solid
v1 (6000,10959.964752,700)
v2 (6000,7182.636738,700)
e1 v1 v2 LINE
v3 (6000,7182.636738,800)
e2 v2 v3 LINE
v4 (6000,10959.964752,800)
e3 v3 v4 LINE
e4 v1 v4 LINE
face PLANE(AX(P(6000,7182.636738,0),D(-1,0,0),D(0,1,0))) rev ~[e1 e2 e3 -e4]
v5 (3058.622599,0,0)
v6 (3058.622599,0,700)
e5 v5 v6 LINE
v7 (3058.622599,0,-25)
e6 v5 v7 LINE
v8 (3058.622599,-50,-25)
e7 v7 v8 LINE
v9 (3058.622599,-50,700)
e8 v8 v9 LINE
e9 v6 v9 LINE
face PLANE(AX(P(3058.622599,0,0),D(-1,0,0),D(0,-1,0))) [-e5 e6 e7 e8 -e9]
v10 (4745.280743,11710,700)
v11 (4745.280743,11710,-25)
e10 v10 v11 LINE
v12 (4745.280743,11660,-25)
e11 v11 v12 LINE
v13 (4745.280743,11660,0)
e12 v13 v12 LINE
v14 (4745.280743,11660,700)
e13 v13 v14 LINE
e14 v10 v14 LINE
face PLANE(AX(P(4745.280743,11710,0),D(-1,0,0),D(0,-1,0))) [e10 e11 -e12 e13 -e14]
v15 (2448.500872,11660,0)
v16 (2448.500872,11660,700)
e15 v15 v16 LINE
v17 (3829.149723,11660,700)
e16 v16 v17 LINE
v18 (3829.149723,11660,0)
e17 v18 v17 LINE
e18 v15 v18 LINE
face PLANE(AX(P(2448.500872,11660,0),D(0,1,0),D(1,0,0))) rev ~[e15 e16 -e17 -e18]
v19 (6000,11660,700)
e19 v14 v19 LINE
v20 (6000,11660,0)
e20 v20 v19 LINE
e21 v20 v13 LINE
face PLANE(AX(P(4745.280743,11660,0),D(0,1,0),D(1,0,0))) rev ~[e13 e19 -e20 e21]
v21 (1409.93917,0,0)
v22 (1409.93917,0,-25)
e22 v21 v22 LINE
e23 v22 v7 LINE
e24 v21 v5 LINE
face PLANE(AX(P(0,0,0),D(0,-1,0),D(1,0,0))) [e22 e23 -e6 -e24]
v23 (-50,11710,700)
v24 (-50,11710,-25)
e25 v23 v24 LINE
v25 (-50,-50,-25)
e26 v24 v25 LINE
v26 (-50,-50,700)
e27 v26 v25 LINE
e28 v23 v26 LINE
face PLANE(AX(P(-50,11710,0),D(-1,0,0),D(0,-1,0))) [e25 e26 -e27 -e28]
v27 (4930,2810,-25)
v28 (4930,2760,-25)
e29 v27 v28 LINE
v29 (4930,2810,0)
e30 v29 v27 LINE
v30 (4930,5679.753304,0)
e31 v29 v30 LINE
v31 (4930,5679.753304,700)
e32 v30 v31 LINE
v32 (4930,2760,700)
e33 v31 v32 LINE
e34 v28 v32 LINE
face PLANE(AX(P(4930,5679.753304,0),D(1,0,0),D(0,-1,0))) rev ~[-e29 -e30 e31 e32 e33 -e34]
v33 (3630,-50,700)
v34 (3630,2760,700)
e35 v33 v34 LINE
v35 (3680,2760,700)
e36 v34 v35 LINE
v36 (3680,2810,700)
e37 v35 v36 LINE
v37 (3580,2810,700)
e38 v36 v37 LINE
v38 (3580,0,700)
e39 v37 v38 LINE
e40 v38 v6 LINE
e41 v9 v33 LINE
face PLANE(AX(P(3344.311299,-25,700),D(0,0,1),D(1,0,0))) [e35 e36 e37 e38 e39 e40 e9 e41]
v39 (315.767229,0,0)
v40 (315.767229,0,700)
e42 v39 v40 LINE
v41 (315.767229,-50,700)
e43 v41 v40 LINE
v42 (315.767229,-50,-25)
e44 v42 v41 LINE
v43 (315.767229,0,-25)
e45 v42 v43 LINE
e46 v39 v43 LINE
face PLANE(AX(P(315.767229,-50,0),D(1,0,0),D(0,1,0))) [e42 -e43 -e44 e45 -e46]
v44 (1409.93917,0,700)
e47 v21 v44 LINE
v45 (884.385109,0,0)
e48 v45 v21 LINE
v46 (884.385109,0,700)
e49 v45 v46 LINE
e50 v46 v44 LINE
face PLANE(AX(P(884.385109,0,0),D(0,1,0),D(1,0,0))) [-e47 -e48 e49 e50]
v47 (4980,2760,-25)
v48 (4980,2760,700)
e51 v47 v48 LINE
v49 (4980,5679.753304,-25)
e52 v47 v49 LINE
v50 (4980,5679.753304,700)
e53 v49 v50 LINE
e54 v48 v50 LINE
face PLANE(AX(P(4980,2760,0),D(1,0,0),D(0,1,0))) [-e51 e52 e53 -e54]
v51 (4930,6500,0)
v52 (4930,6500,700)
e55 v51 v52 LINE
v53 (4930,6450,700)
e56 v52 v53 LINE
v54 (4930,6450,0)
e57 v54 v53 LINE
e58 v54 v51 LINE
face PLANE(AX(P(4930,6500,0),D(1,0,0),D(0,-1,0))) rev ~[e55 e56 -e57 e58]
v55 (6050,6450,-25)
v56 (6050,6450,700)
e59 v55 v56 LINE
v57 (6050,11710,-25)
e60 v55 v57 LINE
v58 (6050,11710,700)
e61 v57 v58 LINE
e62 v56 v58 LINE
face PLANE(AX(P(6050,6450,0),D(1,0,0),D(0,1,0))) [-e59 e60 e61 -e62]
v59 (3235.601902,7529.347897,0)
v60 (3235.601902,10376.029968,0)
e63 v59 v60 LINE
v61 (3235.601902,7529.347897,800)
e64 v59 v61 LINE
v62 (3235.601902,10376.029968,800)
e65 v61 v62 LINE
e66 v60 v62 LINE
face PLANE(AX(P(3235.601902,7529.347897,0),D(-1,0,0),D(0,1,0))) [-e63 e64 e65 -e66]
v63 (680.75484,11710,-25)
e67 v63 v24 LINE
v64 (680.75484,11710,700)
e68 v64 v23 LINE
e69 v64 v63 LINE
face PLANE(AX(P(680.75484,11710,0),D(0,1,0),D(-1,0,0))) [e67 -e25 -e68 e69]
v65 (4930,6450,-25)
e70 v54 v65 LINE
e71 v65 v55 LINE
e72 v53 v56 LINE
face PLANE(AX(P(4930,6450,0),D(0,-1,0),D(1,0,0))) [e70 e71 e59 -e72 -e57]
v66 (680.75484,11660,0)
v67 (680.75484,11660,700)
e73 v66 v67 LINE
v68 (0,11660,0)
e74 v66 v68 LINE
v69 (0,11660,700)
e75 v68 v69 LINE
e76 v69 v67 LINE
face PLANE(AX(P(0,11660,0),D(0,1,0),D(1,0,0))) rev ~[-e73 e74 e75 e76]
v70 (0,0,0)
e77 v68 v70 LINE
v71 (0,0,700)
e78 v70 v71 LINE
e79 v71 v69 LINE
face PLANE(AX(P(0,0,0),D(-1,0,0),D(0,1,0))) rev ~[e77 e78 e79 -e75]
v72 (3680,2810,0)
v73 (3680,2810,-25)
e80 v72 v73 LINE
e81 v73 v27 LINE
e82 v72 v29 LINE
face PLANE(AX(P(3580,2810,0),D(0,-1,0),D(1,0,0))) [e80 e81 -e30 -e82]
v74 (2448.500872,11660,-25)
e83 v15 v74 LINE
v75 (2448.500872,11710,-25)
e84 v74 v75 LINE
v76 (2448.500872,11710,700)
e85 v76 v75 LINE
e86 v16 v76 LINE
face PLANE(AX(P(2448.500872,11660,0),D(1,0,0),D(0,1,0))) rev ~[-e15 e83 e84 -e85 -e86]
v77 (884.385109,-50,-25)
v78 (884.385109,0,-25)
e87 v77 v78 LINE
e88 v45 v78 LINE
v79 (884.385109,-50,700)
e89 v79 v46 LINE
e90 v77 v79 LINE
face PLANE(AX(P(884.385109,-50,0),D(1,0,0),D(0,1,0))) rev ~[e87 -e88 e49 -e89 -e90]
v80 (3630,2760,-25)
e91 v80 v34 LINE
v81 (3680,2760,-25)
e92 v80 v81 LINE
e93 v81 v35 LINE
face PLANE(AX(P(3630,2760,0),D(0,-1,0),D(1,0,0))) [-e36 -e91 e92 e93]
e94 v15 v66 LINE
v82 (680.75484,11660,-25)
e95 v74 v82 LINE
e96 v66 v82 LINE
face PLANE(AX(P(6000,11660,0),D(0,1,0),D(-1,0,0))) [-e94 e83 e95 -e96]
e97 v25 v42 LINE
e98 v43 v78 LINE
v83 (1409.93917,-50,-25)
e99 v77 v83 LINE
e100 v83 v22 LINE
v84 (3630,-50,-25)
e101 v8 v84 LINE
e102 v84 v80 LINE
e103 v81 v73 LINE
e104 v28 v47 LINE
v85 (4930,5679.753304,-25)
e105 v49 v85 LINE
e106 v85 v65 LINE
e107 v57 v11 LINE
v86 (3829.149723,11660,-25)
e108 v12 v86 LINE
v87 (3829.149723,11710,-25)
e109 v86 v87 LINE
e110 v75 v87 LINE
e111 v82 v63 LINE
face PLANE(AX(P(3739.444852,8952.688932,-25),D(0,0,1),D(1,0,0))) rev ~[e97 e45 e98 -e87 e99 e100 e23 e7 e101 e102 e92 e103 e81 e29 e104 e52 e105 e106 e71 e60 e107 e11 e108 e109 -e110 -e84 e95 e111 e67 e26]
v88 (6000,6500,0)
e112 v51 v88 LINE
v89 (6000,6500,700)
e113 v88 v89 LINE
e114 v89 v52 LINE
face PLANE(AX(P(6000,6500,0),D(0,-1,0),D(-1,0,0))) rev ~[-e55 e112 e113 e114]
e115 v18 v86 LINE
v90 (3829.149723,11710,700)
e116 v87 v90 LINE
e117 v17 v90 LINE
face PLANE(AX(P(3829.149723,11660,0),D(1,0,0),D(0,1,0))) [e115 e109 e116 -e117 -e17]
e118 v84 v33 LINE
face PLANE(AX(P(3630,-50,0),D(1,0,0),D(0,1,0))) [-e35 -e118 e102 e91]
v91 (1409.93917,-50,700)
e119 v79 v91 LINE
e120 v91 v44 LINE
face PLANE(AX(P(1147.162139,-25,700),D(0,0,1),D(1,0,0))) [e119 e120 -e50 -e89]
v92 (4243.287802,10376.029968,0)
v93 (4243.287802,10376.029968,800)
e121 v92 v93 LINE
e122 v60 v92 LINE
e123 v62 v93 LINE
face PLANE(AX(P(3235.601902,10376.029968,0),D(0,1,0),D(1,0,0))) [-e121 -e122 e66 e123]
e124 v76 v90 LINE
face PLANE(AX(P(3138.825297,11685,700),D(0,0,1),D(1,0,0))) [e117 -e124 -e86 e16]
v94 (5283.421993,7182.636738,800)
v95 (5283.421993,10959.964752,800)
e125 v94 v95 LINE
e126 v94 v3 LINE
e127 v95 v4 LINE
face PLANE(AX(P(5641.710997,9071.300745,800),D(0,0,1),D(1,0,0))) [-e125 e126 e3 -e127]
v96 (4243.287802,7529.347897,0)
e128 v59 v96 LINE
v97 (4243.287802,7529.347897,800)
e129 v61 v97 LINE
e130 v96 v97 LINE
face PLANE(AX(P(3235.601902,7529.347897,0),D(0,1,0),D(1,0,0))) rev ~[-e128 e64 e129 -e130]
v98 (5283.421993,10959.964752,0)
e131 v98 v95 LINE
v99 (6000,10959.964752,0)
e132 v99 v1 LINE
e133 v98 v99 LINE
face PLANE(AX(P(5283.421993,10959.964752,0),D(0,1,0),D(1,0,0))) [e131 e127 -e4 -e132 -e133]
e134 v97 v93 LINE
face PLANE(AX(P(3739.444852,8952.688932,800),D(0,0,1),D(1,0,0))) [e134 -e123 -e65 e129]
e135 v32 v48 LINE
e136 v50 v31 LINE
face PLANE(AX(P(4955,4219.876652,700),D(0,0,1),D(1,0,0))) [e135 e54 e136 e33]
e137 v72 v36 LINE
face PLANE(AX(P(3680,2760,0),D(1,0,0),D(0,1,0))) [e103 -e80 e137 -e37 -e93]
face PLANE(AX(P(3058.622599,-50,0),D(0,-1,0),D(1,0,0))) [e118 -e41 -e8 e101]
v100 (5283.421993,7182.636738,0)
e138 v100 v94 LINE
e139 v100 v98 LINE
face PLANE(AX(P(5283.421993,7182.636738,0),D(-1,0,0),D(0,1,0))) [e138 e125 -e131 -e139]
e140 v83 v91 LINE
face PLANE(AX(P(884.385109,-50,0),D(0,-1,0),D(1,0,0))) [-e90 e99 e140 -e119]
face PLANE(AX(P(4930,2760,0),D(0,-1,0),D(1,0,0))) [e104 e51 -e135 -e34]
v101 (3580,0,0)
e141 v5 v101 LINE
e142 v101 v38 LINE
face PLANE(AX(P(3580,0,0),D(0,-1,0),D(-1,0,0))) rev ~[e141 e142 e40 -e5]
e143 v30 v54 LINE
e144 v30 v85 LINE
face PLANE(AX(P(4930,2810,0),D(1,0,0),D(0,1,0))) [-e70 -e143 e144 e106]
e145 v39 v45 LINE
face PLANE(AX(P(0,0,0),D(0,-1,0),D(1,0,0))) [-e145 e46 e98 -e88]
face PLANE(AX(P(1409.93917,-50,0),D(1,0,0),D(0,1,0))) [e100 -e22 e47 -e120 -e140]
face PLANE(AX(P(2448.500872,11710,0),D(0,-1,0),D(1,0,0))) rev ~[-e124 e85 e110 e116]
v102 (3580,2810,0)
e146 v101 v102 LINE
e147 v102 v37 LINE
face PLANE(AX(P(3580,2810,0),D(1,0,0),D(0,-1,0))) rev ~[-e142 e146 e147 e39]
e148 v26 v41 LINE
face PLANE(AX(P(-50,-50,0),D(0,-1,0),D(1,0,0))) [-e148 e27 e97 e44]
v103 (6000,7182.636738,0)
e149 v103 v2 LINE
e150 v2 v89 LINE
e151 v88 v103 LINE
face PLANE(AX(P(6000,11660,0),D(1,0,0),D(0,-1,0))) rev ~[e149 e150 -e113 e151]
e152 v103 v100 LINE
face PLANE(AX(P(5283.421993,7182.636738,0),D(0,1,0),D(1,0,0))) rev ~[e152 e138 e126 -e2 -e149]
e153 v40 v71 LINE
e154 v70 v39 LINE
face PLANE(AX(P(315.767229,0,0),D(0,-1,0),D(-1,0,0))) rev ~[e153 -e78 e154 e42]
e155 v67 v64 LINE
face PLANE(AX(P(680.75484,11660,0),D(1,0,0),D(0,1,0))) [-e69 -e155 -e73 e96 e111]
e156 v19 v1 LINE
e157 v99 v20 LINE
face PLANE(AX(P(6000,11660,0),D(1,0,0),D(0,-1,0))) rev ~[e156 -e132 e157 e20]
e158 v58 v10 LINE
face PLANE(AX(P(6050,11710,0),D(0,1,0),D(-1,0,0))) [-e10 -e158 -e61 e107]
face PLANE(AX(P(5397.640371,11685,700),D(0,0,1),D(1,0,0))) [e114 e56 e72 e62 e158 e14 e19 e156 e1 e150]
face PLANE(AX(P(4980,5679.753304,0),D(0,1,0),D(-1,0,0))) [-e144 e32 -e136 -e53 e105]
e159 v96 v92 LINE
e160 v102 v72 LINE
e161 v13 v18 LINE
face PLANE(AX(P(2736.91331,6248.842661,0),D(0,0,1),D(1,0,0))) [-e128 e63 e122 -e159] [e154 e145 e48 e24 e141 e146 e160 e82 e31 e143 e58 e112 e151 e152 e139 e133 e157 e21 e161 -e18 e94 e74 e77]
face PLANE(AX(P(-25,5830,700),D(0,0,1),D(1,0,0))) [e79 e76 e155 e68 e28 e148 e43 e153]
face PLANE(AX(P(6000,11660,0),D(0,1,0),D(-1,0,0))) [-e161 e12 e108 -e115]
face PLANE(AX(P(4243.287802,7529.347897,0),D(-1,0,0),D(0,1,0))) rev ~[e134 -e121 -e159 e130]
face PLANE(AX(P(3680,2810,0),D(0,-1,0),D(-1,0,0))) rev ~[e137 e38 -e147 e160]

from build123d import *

# Parameters (mm, degrees)
F0_W          = 1007.6858997345
F0_H          = 2846.6820716858
F1_DEPTH      = 25
F0_W_2        = 50
F0_H_2        = 11660
F0_W_3        = 680.754840374
F0_H_3        = 50
F0_W_4        = 525.554060936
F0_W_5        = 1380.6488513947
F2_DEPTH      = 700
F2_DEPTH_BACK = 25
F0_W_6        = 716.5780067444
F0_H_4        = 3777.3280143738
F3_DEPTH      = 800
F3_DEPTH_BACK = 25


with BuildPart() as f1:
    # F0 (on Top) → F1 (new body)
    with BuildSketch(Plane.XY):
        Polygon((0, 11660), (0, 0), (315.7672286034, 0), (884.3851089478, 0), (1409.9391698837, 0), (3058.6225986481, 0), (3580, 0), (3580, 2810), (3630, 2810), (3680, 2810), (4930, 2810), (4930, 5679.7533035278), (4930, 6450), (4930, 6500), (5082.5057029724, 6500), (6000, 6500), (6000, 7182.6367378235), (5283.4219932556, 7182.6367378235), (5283.4219932556, 10959.9647521973), (6000, 10959.9647521973), (6000, 11660), (4745.2807426453, 11660), (3829.149723053, 11660), (2448.5008716583, 11660), (680.754840374, 11660), align=None)
        with Locations((3739.4448518753, 8952.6889324188)):
            Rectangle(F0_W, F0_H, mode=Mode.SUBTRACT)
    extrude(amount=-F1_DEPTH)

    # F0 (on Top) → F2 (join, two sides)
    with BuildSketch(Plane.XY) as f2_sk:
        with Locations((-25, 5830)):
            Rectangle(F0_W_2, F0_H_2)
        Polygon((315.7672286034, 0), (0, 0), (-50, 0), (-50, -50), (315.7672286034, -50), align=None)
        with Locations((340.377420187, 11685)):
            Rectangle(F0_W_3, F0_H_3)
        with Locations((-25, 11685)):
            Rectangle(F0_W_2, F0_H_3)
        with Locations((1147.1621394157, -25)):
            Rectangle(F0_W_4, F0_H_3)
        with Locations((3138.8252973557, 11685)):
            Rectangle(F0_W_5, F0_H_3)
        Polygon((3580, 0), (3058.6225986481, 0), (3058.6225986481, -50), (3630, -50), (3630, 0), align=None)
        Polygon((4745.2807426453, 11710), (4745.2807426453, 11660), (6000, 11660), (6050, 11660), (6050, 11710), align=None)
        Polygon((3580, 2810), (3580, 0), (3630, 0), (3630, 2760), (3630, 2810), align=None)
        Polygon((6050, 11660), (6000, 11660), (6000, 10959.9647521973), (6000, 7182.6367378235), (6000, 6500), (6000, 6450), (6050, 6450), align=None)
        with Locations((3655, 2785)):
            Rectangle(F0_W_2, F0_H_3)
        Polygon((6000, 6450), (6000, 6500), (5082.5057029724, 6500), (4930, 6500), (4930, 6450), align=None)
        Polygon((4930, 5679.7533035278), (4930, 2810), (4930, 2760), (4980, 2760), (4980, 5679.7533035278), align=None)
    extrude(amount=F2_DEPTH)
    extrude(f2_sk.sketch, amount=-F2_DEPTH_BACK)

    # F0 (on Top) → F3 (join, two sides)
    with BuildSketch(Plane.XY) as f3_sk:
        with Locations((3739.4448518753, 8952.6889324188)):
            Rectangle(F0_W, F0_H)
        with Locations((5641.7109966278, 9071.3007450104)):
            Rectangle(F0_W_6, F0_H_4)
    extrude(amount=F3_DEPTH)
    extrude(f3_sk.sketch, amount=-F3_DEPTH_BACK)


solid = f1.part
